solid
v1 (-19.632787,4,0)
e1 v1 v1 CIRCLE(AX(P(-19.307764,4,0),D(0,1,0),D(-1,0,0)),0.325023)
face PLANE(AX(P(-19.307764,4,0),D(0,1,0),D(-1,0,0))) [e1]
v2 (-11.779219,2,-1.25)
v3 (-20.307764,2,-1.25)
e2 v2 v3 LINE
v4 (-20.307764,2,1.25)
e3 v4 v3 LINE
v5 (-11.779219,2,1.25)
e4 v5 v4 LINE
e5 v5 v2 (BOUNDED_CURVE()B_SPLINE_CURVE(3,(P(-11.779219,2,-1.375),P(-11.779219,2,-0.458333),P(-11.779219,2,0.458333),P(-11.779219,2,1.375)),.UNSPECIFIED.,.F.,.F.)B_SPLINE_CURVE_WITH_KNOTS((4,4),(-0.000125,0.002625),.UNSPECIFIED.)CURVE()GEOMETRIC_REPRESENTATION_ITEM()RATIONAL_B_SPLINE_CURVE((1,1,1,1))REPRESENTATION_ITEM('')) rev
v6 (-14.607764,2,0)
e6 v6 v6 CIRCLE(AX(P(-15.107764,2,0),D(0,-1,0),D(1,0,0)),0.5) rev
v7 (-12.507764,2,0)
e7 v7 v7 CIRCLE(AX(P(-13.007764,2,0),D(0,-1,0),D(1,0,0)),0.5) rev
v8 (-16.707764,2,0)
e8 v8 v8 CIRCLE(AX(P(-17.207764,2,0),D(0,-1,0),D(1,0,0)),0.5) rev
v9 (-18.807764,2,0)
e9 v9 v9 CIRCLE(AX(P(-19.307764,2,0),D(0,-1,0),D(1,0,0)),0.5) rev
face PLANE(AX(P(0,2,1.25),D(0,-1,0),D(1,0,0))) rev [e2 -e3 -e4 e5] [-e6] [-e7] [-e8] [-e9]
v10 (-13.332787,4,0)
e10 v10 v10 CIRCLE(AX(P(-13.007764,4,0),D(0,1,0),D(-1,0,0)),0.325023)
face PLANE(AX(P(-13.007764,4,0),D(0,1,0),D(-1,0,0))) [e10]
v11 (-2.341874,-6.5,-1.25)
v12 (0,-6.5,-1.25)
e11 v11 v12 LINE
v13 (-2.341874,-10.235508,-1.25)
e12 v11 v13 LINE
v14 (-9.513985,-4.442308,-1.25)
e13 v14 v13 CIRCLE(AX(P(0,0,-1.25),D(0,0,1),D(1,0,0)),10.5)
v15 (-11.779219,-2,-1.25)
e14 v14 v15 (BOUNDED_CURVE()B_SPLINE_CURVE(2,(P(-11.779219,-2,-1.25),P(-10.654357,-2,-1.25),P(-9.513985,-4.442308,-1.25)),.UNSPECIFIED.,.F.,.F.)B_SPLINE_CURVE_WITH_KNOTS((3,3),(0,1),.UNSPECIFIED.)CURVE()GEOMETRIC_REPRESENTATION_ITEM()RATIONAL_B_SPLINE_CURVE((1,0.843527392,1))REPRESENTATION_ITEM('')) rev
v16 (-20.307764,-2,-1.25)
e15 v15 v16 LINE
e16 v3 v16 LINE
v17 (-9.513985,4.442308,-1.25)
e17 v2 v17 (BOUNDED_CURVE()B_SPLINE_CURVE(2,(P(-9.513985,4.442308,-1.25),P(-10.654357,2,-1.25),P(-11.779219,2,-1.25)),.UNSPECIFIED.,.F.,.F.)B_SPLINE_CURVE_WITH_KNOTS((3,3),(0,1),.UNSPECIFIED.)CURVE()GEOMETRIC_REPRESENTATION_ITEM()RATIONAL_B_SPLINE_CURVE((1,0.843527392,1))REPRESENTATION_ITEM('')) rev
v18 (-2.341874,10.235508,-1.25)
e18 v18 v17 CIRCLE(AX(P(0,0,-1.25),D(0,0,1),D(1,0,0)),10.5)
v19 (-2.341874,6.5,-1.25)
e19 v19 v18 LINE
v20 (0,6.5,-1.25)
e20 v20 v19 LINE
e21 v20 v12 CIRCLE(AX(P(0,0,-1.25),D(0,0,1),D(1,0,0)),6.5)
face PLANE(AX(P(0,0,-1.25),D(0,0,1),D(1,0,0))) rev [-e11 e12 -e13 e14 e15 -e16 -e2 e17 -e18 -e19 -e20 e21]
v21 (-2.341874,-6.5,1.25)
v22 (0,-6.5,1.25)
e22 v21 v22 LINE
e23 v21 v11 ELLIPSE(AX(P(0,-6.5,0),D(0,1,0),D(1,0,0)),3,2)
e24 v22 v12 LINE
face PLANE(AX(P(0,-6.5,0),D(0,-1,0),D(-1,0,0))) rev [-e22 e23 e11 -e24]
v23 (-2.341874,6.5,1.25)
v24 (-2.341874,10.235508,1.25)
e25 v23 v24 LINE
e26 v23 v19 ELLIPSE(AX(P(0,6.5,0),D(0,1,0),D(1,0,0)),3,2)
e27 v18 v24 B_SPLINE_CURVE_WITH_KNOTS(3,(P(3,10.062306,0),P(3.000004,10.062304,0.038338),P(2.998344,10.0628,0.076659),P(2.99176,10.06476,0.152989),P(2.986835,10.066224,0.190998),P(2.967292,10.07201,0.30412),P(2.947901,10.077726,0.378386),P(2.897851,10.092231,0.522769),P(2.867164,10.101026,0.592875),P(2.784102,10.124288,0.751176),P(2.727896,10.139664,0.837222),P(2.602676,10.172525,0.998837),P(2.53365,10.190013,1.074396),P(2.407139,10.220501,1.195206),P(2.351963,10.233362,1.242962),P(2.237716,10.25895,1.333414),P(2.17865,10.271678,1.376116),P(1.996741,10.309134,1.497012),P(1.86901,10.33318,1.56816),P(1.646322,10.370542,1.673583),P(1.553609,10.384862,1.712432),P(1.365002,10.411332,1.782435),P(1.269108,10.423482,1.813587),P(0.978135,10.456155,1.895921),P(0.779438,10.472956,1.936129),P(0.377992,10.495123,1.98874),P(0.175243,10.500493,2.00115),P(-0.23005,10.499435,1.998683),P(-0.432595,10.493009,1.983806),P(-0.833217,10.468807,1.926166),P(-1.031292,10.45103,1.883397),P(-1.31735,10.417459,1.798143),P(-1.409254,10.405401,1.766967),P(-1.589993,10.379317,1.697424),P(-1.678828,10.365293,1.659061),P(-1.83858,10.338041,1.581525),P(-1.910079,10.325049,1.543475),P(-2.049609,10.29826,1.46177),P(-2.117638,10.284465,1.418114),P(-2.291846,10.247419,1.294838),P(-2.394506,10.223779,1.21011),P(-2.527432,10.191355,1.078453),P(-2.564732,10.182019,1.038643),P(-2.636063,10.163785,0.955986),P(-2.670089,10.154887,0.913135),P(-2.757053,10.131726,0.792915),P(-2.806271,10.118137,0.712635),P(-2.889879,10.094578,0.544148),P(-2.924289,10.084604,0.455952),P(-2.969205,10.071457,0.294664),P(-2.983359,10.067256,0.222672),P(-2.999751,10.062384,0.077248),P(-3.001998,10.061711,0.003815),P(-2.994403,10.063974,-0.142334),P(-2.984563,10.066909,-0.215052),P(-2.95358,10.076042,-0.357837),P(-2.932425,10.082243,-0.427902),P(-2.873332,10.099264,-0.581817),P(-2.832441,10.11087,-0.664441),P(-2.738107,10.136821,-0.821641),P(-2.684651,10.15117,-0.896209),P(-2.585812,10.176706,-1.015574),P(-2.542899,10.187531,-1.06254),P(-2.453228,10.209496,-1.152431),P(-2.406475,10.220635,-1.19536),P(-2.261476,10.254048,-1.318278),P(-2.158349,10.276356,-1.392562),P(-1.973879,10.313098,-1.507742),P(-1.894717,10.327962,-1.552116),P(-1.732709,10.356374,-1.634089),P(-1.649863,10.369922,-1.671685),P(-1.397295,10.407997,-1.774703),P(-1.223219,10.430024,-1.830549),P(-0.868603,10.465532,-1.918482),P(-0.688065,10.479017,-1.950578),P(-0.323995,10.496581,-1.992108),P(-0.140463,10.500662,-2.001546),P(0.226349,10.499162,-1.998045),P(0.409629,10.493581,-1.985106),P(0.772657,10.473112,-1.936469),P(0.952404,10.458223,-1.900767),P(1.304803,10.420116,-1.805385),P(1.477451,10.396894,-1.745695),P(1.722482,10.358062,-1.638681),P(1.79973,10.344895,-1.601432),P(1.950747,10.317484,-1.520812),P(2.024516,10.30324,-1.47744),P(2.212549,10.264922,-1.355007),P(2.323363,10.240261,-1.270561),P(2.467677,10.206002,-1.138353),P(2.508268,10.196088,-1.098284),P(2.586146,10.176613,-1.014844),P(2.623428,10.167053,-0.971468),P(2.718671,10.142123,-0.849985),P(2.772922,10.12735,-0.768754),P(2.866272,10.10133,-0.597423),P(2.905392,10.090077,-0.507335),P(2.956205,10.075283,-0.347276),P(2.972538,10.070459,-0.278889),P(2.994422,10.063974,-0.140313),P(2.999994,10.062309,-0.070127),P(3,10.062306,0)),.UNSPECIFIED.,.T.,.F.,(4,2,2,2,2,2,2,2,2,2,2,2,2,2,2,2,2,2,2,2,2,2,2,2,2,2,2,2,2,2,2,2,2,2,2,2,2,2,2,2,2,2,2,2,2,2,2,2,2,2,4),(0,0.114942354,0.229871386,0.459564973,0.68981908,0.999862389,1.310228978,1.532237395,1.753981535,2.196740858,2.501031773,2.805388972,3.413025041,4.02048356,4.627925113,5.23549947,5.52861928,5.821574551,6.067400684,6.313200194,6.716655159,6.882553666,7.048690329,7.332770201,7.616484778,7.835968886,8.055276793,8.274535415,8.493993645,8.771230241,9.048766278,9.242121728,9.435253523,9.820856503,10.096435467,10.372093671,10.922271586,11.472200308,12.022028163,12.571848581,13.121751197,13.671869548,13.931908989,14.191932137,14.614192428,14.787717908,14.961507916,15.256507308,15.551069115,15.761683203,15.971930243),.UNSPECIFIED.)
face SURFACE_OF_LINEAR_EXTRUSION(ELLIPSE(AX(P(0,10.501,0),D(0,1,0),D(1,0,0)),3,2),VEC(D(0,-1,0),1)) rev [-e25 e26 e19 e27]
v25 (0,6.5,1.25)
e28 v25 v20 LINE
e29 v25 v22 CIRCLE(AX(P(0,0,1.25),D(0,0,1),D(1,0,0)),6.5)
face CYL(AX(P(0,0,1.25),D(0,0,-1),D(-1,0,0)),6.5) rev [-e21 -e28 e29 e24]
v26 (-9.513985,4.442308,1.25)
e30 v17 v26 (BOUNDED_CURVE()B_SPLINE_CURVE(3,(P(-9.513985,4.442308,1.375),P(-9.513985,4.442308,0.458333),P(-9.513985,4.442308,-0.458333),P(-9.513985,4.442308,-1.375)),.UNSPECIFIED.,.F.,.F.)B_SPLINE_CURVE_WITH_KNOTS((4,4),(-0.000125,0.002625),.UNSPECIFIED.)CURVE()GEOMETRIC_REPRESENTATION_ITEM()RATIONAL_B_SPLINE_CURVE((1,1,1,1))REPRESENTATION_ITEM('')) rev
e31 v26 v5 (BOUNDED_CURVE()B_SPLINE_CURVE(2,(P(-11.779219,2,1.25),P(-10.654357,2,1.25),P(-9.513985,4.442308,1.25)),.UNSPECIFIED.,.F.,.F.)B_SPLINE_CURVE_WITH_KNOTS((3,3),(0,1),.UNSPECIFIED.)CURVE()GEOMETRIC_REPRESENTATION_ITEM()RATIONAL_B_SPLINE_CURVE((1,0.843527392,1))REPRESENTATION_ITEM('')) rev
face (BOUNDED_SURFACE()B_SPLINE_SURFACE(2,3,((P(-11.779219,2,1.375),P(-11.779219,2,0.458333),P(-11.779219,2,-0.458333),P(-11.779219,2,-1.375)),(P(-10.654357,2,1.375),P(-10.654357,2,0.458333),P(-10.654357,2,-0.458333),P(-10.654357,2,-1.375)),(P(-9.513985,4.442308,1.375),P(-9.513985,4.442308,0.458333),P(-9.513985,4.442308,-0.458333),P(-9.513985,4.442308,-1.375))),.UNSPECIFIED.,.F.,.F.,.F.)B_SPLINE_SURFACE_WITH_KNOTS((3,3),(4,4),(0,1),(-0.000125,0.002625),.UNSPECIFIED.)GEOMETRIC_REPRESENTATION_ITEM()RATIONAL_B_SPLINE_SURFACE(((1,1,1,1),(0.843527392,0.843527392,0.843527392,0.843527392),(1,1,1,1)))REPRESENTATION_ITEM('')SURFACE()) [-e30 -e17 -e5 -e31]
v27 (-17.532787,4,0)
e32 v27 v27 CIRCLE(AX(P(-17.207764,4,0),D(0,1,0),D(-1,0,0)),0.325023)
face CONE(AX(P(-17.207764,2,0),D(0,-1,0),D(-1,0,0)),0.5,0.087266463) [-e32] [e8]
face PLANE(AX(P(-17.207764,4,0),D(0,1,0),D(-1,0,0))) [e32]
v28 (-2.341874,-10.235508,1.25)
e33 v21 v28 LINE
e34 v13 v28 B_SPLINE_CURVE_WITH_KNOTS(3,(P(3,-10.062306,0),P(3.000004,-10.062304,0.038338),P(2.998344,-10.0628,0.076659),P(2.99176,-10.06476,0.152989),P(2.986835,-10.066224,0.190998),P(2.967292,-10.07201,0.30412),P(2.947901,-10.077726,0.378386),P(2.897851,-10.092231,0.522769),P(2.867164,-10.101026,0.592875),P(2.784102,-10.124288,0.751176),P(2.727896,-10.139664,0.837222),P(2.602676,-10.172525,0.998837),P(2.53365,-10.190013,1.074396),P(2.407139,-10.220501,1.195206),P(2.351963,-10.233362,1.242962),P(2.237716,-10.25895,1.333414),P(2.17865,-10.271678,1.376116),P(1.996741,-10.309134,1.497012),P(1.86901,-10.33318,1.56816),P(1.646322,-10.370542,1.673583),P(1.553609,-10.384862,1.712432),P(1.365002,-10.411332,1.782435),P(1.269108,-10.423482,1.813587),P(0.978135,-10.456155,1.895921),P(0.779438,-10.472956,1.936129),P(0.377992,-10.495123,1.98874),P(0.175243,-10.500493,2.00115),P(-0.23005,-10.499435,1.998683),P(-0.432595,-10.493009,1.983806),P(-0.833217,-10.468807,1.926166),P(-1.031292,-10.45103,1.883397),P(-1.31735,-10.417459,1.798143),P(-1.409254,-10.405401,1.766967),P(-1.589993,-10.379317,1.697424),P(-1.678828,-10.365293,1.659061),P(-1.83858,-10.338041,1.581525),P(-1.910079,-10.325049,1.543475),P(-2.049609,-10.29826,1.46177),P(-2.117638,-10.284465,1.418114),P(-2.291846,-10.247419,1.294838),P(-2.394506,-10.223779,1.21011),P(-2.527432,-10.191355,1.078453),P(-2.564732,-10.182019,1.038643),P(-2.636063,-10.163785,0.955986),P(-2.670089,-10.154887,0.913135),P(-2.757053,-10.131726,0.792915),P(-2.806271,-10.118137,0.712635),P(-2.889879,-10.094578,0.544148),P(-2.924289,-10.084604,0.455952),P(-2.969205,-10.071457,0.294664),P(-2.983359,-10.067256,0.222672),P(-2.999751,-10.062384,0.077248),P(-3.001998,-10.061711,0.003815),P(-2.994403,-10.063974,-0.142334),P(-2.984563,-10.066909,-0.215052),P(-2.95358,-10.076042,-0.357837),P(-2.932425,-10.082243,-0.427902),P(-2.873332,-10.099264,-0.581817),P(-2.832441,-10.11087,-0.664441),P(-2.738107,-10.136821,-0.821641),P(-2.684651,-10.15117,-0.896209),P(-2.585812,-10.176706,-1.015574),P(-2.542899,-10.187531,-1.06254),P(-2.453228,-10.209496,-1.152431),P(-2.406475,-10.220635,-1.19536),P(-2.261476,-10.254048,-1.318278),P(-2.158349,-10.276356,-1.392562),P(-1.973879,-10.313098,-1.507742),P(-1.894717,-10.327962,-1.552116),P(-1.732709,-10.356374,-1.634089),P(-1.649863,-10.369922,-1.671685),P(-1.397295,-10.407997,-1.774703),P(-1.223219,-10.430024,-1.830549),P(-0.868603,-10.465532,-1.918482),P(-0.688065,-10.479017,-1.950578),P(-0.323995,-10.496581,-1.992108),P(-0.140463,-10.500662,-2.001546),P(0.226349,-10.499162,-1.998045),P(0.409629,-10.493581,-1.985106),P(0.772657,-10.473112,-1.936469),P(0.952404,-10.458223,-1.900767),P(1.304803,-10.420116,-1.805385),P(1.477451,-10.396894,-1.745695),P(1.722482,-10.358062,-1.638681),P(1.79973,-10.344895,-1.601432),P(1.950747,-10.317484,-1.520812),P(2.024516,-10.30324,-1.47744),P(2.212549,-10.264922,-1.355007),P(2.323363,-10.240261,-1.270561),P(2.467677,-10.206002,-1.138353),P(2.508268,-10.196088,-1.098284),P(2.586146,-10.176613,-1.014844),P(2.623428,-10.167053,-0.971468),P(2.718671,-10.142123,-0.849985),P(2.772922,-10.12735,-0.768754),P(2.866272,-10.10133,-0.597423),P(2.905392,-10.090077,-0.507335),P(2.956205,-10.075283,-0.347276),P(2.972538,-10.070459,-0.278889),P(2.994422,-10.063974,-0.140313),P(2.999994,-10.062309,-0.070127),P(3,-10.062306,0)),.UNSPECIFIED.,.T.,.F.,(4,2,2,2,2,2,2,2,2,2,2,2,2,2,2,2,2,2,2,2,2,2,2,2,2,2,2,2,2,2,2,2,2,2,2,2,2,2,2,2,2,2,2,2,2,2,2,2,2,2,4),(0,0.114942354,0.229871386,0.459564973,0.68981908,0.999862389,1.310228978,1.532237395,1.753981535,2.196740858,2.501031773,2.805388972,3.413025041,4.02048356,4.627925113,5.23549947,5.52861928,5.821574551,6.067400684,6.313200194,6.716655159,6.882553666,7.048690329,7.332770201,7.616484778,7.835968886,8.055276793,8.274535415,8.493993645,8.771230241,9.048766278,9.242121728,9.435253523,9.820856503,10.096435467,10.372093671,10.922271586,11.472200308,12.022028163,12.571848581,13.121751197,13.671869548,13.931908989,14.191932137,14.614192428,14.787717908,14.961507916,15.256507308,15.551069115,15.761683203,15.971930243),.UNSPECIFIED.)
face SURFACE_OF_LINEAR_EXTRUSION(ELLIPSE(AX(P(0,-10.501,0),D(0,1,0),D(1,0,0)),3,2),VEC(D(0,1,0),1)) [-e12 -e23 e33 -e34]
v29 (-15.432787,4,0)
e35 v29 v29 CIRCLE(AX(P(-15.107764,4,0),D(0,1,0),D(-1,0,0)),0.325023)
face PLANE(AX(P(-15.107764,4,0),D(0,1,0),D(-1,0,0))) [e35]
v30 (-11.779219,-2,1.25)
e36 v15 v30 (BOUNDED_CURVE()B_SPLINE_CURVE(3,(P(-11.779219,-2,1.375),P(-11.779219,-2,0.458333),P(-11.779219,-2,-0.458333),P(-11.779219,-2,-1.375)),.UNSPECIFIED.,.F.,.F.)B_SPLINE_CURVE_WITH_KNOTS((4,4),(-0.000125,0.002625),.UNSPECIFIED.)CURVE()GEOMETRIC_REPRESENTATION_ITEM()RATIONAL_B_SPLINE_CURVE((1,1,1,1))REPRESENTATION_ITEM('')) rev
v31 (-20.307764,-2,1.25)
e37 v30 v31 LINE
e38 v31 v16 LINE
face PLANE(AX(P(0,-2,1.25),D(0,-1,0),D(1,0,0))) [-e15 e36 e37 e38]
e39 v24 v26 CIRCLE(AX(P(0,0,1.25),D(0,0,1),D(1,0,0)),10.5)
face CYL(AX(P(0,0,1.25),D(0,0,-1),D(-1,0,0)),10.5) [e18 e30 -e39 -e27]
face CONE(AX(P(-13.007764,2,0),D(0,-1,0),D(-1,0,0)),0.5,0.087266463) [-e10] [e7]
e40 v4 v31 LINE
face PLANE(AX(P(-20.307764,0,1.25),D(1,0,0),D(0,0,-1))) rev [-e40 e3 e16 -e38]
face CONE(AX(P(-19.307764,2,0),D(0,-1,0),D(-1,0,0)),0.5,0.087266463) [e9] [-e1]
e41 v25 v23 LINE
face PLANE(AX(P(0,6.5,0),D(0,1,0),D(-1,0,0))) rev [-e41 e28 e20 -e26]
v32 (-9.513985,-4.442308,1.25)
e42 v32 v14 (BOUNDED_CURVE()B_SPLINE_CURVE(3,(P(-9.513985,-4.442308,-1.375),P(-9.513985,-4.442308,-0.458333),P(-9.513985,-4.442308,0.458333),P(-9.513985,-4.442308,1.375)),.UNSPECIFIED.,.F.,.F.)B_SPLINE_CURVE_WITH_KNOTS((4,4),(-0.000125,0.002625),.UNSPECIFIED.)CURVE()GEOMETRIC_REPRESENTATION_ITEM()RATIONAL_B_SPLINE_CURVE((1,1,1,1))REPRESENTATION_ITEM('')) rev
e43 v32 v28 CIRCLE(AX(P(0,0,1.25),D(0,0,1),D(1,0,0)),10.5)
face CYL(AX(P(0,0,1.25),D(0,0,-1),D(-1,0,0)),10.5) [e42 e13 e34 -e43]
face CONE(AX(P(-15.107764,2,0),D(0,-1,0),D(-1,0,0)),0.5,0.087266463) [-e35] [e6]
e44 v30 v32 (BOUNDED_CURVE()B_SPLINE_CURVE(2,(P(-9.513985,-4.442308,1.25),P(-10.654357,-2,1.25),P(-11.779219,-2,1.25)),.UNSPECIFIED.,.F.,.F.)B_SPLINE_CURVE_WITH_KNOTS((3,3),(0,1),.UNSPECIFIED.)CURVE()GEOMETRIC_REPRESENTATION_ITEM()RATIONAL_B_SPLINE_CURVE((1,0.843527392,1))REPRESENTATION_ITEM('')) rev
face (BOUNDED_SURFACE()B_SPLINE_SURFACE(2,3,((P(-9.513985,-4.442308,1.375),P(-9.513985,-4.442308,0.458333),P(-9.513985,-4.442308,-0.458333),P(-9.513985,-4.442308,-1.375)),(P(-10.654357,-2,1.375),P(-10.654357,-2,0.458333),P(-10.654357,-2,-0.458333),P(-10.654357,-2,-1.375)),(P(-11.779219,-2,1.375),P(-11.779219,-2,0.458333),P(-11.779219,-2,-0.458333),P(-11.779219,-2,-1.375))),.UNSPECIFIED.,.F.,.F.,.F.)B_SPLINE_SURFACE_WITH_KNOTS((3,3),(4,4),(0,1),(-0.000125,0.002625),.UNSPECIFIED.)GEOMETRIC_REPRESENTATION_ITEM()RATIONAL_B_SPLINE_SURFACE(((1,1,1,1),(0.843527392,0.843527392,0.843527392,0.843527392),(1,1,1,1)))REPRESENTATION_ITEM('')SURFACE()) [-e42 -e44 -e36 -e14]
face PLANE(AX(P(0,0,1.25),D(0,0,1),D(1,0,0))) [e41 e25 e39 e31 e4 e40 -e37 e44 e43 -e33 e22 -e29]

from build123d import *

# Parameters (mm, degrees)
BOSS_EXTRUDE1_DEPTH           = 1.25
SKETCH2_R                     = 0.5
BOSS_EXTRUDE2_DEPTH           = 2
BOSS_EXTRUDE2_DRAFT           = 5
BOSS_EXTRUDE2_PROFILE_2_DEPTH = 2
BOSS_EXTRUDE2_PROFILE_2_DRAFT = 5
BOSS_EXTRUDE2_PROFILE_3_DEPTH = 2
BOSS_EXTRUDE2_PROFILE_3_DRAFT = 5
BOSS_EXTRUDE2_PROFILE_4_DEPTH = 2
BOSS_EXTRUDE2_PROFILE_4_DRAFT = 5
BOSS_EXTRUDE3_REACH           = 28.514
BOSS_EXTRUDE3_END_RADIUS      = 10.5
SKETCH5_RX                    = 3
SKETCH5_RY                    = 2
FILLET1_START                 = -1.25
FILLET1_DEPTH                 = 2.5


with BuildPart() as part:
    # Sketch1 → Boss-Extrude1 (new, symmetric)
    with BuildSketch(Plane.XY):
        with BuildLine():
            Line((-10.307764064, 2), (-20.307764064, 2))
            Line((-20.307764064, 2), (-20.307764064, -2))
            Line((-20.307764064, -2), (-10.307764064, -2))
            ThreePointArc((-10.307764064, -2), (-10.5, 0), (-10.307764064, 2))
        make_face()
        with BuildLine():
            Line((1.74e-07, 10.5), (1.74e-07, 6.5))
            ThreePointArc((1.74e-07, 6.5), (-6.5, 0), (1.74e-07, -6.5))
            Line((1.74e-07, -6.5), (1.74e-07, -10.5))
            ThreePointArc((1.74e-07, -10.5), (-10.5, 0), (1.74e-07, 10.5))
        make_face()
        with BuildLine():
            ThreePointArc((1.74e-07, 10.5), (-0.626113962, 10.481315819), (-1.249999826, 10.425329752))
            Line((-1.249999826, 10.425329752), (-1.249999826, 6.5))
            Line((-1.249999826, 6.5), (1.74e-07, 6.5))
            Line((1.74e-07, 6.5), (1.74e-07, 10.5))
        make_face()
        with BuildLine():
            Line((-1.249999826, -6.5), (-1.249999826, -10.425329752))
            ThreePointArc((-1.249999826, -10.425329752), (-0.626113962, -10.481315819), (1.74e-07, -10.5))
            Line((1.74e-07, -10.5), (1.74e-07, -6.5))
            Line((1.74e-07, -6.5), (-1.249999826, -6.5))
        make_face()
    extrude(amount=BOSS_EXTRUDE1_DEPTH, both=True)


with BuildPart() as boss_extrude2_tool:
    # Sketch2 → Boss-Extrude2 (with draft: the straight prism first)
    with BuildSketch(Plane(origin=(0, 2, 0), x_dir=(1, 0, 0), z_dir=(0, 1, 0))):
        with Locations((-19.307764064, 0)):
            Circle(SKETCH2_R)
    extrude(amount=BOSS_EXTRUDE2_DEPTH)
    # Boss-Extrude2: the draft: its side faces are tilted about the plane it starts from
    boss_extrude2_sides = [boss_extrude2_tool.faces().sort_by_distance(p)[0] for p in [
        (-19.807764064, 3, 0),
    ]]
    draft(boss_extrude2_sides, Plane(origin=(0, 2, 0), x_dir=(1, 0, 0), z_dir=(0, 1, 0)), BOSS_EXTRUDE2_DRAFT)


with BuildPart() as part_1:
    add(part.part)

    # Boss-Extrude2: add boss_extrude2_tool
    add(boss_extrude2_tool.part)


with BuildPart() as boss_extrude2_profile_2_tool:
    # Sketch2 → Boss-Extrude2 profile 2 (with draft: the straight prism first)
    with BuildSketch(Plane(origin=(0, 2, 0), x_dir=(1, 0, 0), z_dir=(0, 1, 0))):
        with Locations((-17.207764064, 0)):
            Circle(SKETCH2_R)
    extrude(amount=BOSS_EXTRUDE2_PROFILE_2_DEPTH)
    # Boss-Extrude2 profile 2: the draft: its side faces are tilted about the plane it starts from
    boss_extrude2_profile_2_sides = [boss_extrude2_profile_2_tool.faces().sort_by_distance(p)[0] for p in [
        (-17.707764064, 3, 0),
    ]]
    draft(boss_extrude2_profile_2_sides, Plane(origin=(0, 2, 0), x_dir=(1, 0, 0), z_dir=(0, 1, 0)), BOSS_EXTRUDE2_PROFILE_2_DRAFT)


with BuildPart() as part_2:
    add(part_1.part)

    # Boss-Extrude2 profile 2: add boss_extrude2_profile_2_tool
    add(boss_extrude2_profile_2_tool.part)


with BuildPart() as boss_extrude2_profile_3_tool:
    # Sketch2 → Boss-Extrude2 profile 3 (with draft: the straight prism first)
    with BuildSketch(Plane(origin=(0, 2, 0), x_dir=(1, 0, 0), z_dir=(0, 1, 0))):
        with Locations((-15.107764064, 0)):
            Circle(SKETCH2_R)
    extrude(amount=BOSS_EXTRUDE2_PROFILE_3_DEPTH)
    # Boss-Extrude2 profile 3: the draft: its side faces are tilted about the plane it starts from
    boss_extrude2_profile_3_sides = [boss_extrude2_profile_3_tool.faces().sort_by_distance(p)[0] for p in [
        (-15.607764064, 3, 0),
    ]]
    draft(boss_extrude2_profile_3_sides, Plane(origin=(0, 2, 0), x_dir=(1, 0, 0), z_dir=(0, 1, 0)), BOSS_EXTRUDE2_PROFILE_3_DRAFT)


with BuildPart() as part_3:
    add(part_2.part)

    # Boss-Extrude2 profile 3: add boss_extrude2_profile_3_tool
    add(boss_extrude2_profile_3_tool.part)


with BuildPart() as boss_extrude2_profile_4_tool:
    # Sketch2 → Boss-Extrude2 profile 4 (with draft: the straight prism first)
    with BuildSketch(Plane(origin=(0, 2, 0), x_dir=(1, 0, 0), z_dir=(0, 1, 0))):
        with Locations((-13.007764064, 0)):
            Circle(SKETCH2_R)
    extrude(amount=BOSS_EXTRUDE2_PROFILE_4_DEPTH)
    # Boss-Extrude2 profile 4: the draft: its side faces are tilted about the plane it starts from
    boss_extrude2_profile_4_sides = [boss_extrude2_profile_4_tool.faces().sort_by_distance(p)[0] for p in [
        (-13.507764064, 3, 0),
    ]]
    draft(boss_extrude2_profile_4_sides, Plane(origin=(0, 2, 0), x_dir=(1, 0, 0), z_dir=(0, 1, 0)), BOSS_EXTRUDE2_PROFILE_4_DRAFT)


with BuildPart() as part_4:
    add(part_3.part)

    # Boss-Extrude2 profile 4: add boss_extrude2_profile_4_tool
    add(boss_extrude2_profile_4_tool.part)

    # Boss-Extrude3: up to this cylinder (the profile starts inside it)
    boss_extrude3_end = Plane(origin=(0, 0, 0), z_dir=(0, 0, -1)) * Cylinder(BOSS_EXTRUDE3_END_RADIUS, 79.028, mode=Mode.PRIVATE)
    # Sketch5 → Boss-Extrude3 (add, up to the surface)
    with BuildSketch(Plane(origin=(0, 6.5, 0), x_dir=(1, 0, 0), z_dir=(0, 1, 0)), mode=Mode.PRIVATE) as boss_extrude3_sk1:
        with Locations((0, 0)):
            Ellipse(SKETCH5_RX, SKETCH5_RY)
    boss_extrude3_tool1 = extrude(boss_extrude3_sk1.sketch, amount=BOSS_EXTRUDE3_REACH, mode=Mode.PRIVATE) & boss_extrude3_end
    boss_extrude3 = boss_extrude3_tool1.solids().sort_by_distance((0, 6.5, 0))[0]
    add(boss_extrude3)

    # Mirror1: Boss-Extrude3 across plane
    add(boss_extrude3.mirror(Plane.ZX))

    # Fillet1: read off the stored shape, not the designer's step
    # Fillet1 outline → Fillet1 (add)
    with BuildSketch(Plane.XY.offset(FILLET1_START)):
        with BuildLine():
            add(Edge.make_bspline(
                [(-11.779218989, 2), (-10.654356635, 2), (-9.513984568, 4.442307692)],
                knots=[0, 0, 0, 1, 1, 1], degree=2, weights=[1, 0.843527392, 1]))
            Line((-11.779218989, 2), (-10.307764064, 2))
            ThreePointArc((-10.307764064, 2), (-9.985822271, 3.245512837), (-9.513984568, 4.442307692))
        make_face()
        with BuildLine():
            add(Edge.make_bspline(
                [(-9.513984568, -4.442307692), (-10.654356635, -2), (-11.779218989, -2)],
                knots=[0, 0, 0, 1, 1, 1], degree=2, weights=[1, 0.843527392, 1]))
            ThreePointArc((-9.513984568, -4.442307692), (-9.985822271, -3.245512837), (-10.307764064, -2))
            Line((-10.307764064, -2), (-11.779218989, -2))
        make_face()
    extrude(amount=FILLET1_DEPTH)


solid = part_4.part
